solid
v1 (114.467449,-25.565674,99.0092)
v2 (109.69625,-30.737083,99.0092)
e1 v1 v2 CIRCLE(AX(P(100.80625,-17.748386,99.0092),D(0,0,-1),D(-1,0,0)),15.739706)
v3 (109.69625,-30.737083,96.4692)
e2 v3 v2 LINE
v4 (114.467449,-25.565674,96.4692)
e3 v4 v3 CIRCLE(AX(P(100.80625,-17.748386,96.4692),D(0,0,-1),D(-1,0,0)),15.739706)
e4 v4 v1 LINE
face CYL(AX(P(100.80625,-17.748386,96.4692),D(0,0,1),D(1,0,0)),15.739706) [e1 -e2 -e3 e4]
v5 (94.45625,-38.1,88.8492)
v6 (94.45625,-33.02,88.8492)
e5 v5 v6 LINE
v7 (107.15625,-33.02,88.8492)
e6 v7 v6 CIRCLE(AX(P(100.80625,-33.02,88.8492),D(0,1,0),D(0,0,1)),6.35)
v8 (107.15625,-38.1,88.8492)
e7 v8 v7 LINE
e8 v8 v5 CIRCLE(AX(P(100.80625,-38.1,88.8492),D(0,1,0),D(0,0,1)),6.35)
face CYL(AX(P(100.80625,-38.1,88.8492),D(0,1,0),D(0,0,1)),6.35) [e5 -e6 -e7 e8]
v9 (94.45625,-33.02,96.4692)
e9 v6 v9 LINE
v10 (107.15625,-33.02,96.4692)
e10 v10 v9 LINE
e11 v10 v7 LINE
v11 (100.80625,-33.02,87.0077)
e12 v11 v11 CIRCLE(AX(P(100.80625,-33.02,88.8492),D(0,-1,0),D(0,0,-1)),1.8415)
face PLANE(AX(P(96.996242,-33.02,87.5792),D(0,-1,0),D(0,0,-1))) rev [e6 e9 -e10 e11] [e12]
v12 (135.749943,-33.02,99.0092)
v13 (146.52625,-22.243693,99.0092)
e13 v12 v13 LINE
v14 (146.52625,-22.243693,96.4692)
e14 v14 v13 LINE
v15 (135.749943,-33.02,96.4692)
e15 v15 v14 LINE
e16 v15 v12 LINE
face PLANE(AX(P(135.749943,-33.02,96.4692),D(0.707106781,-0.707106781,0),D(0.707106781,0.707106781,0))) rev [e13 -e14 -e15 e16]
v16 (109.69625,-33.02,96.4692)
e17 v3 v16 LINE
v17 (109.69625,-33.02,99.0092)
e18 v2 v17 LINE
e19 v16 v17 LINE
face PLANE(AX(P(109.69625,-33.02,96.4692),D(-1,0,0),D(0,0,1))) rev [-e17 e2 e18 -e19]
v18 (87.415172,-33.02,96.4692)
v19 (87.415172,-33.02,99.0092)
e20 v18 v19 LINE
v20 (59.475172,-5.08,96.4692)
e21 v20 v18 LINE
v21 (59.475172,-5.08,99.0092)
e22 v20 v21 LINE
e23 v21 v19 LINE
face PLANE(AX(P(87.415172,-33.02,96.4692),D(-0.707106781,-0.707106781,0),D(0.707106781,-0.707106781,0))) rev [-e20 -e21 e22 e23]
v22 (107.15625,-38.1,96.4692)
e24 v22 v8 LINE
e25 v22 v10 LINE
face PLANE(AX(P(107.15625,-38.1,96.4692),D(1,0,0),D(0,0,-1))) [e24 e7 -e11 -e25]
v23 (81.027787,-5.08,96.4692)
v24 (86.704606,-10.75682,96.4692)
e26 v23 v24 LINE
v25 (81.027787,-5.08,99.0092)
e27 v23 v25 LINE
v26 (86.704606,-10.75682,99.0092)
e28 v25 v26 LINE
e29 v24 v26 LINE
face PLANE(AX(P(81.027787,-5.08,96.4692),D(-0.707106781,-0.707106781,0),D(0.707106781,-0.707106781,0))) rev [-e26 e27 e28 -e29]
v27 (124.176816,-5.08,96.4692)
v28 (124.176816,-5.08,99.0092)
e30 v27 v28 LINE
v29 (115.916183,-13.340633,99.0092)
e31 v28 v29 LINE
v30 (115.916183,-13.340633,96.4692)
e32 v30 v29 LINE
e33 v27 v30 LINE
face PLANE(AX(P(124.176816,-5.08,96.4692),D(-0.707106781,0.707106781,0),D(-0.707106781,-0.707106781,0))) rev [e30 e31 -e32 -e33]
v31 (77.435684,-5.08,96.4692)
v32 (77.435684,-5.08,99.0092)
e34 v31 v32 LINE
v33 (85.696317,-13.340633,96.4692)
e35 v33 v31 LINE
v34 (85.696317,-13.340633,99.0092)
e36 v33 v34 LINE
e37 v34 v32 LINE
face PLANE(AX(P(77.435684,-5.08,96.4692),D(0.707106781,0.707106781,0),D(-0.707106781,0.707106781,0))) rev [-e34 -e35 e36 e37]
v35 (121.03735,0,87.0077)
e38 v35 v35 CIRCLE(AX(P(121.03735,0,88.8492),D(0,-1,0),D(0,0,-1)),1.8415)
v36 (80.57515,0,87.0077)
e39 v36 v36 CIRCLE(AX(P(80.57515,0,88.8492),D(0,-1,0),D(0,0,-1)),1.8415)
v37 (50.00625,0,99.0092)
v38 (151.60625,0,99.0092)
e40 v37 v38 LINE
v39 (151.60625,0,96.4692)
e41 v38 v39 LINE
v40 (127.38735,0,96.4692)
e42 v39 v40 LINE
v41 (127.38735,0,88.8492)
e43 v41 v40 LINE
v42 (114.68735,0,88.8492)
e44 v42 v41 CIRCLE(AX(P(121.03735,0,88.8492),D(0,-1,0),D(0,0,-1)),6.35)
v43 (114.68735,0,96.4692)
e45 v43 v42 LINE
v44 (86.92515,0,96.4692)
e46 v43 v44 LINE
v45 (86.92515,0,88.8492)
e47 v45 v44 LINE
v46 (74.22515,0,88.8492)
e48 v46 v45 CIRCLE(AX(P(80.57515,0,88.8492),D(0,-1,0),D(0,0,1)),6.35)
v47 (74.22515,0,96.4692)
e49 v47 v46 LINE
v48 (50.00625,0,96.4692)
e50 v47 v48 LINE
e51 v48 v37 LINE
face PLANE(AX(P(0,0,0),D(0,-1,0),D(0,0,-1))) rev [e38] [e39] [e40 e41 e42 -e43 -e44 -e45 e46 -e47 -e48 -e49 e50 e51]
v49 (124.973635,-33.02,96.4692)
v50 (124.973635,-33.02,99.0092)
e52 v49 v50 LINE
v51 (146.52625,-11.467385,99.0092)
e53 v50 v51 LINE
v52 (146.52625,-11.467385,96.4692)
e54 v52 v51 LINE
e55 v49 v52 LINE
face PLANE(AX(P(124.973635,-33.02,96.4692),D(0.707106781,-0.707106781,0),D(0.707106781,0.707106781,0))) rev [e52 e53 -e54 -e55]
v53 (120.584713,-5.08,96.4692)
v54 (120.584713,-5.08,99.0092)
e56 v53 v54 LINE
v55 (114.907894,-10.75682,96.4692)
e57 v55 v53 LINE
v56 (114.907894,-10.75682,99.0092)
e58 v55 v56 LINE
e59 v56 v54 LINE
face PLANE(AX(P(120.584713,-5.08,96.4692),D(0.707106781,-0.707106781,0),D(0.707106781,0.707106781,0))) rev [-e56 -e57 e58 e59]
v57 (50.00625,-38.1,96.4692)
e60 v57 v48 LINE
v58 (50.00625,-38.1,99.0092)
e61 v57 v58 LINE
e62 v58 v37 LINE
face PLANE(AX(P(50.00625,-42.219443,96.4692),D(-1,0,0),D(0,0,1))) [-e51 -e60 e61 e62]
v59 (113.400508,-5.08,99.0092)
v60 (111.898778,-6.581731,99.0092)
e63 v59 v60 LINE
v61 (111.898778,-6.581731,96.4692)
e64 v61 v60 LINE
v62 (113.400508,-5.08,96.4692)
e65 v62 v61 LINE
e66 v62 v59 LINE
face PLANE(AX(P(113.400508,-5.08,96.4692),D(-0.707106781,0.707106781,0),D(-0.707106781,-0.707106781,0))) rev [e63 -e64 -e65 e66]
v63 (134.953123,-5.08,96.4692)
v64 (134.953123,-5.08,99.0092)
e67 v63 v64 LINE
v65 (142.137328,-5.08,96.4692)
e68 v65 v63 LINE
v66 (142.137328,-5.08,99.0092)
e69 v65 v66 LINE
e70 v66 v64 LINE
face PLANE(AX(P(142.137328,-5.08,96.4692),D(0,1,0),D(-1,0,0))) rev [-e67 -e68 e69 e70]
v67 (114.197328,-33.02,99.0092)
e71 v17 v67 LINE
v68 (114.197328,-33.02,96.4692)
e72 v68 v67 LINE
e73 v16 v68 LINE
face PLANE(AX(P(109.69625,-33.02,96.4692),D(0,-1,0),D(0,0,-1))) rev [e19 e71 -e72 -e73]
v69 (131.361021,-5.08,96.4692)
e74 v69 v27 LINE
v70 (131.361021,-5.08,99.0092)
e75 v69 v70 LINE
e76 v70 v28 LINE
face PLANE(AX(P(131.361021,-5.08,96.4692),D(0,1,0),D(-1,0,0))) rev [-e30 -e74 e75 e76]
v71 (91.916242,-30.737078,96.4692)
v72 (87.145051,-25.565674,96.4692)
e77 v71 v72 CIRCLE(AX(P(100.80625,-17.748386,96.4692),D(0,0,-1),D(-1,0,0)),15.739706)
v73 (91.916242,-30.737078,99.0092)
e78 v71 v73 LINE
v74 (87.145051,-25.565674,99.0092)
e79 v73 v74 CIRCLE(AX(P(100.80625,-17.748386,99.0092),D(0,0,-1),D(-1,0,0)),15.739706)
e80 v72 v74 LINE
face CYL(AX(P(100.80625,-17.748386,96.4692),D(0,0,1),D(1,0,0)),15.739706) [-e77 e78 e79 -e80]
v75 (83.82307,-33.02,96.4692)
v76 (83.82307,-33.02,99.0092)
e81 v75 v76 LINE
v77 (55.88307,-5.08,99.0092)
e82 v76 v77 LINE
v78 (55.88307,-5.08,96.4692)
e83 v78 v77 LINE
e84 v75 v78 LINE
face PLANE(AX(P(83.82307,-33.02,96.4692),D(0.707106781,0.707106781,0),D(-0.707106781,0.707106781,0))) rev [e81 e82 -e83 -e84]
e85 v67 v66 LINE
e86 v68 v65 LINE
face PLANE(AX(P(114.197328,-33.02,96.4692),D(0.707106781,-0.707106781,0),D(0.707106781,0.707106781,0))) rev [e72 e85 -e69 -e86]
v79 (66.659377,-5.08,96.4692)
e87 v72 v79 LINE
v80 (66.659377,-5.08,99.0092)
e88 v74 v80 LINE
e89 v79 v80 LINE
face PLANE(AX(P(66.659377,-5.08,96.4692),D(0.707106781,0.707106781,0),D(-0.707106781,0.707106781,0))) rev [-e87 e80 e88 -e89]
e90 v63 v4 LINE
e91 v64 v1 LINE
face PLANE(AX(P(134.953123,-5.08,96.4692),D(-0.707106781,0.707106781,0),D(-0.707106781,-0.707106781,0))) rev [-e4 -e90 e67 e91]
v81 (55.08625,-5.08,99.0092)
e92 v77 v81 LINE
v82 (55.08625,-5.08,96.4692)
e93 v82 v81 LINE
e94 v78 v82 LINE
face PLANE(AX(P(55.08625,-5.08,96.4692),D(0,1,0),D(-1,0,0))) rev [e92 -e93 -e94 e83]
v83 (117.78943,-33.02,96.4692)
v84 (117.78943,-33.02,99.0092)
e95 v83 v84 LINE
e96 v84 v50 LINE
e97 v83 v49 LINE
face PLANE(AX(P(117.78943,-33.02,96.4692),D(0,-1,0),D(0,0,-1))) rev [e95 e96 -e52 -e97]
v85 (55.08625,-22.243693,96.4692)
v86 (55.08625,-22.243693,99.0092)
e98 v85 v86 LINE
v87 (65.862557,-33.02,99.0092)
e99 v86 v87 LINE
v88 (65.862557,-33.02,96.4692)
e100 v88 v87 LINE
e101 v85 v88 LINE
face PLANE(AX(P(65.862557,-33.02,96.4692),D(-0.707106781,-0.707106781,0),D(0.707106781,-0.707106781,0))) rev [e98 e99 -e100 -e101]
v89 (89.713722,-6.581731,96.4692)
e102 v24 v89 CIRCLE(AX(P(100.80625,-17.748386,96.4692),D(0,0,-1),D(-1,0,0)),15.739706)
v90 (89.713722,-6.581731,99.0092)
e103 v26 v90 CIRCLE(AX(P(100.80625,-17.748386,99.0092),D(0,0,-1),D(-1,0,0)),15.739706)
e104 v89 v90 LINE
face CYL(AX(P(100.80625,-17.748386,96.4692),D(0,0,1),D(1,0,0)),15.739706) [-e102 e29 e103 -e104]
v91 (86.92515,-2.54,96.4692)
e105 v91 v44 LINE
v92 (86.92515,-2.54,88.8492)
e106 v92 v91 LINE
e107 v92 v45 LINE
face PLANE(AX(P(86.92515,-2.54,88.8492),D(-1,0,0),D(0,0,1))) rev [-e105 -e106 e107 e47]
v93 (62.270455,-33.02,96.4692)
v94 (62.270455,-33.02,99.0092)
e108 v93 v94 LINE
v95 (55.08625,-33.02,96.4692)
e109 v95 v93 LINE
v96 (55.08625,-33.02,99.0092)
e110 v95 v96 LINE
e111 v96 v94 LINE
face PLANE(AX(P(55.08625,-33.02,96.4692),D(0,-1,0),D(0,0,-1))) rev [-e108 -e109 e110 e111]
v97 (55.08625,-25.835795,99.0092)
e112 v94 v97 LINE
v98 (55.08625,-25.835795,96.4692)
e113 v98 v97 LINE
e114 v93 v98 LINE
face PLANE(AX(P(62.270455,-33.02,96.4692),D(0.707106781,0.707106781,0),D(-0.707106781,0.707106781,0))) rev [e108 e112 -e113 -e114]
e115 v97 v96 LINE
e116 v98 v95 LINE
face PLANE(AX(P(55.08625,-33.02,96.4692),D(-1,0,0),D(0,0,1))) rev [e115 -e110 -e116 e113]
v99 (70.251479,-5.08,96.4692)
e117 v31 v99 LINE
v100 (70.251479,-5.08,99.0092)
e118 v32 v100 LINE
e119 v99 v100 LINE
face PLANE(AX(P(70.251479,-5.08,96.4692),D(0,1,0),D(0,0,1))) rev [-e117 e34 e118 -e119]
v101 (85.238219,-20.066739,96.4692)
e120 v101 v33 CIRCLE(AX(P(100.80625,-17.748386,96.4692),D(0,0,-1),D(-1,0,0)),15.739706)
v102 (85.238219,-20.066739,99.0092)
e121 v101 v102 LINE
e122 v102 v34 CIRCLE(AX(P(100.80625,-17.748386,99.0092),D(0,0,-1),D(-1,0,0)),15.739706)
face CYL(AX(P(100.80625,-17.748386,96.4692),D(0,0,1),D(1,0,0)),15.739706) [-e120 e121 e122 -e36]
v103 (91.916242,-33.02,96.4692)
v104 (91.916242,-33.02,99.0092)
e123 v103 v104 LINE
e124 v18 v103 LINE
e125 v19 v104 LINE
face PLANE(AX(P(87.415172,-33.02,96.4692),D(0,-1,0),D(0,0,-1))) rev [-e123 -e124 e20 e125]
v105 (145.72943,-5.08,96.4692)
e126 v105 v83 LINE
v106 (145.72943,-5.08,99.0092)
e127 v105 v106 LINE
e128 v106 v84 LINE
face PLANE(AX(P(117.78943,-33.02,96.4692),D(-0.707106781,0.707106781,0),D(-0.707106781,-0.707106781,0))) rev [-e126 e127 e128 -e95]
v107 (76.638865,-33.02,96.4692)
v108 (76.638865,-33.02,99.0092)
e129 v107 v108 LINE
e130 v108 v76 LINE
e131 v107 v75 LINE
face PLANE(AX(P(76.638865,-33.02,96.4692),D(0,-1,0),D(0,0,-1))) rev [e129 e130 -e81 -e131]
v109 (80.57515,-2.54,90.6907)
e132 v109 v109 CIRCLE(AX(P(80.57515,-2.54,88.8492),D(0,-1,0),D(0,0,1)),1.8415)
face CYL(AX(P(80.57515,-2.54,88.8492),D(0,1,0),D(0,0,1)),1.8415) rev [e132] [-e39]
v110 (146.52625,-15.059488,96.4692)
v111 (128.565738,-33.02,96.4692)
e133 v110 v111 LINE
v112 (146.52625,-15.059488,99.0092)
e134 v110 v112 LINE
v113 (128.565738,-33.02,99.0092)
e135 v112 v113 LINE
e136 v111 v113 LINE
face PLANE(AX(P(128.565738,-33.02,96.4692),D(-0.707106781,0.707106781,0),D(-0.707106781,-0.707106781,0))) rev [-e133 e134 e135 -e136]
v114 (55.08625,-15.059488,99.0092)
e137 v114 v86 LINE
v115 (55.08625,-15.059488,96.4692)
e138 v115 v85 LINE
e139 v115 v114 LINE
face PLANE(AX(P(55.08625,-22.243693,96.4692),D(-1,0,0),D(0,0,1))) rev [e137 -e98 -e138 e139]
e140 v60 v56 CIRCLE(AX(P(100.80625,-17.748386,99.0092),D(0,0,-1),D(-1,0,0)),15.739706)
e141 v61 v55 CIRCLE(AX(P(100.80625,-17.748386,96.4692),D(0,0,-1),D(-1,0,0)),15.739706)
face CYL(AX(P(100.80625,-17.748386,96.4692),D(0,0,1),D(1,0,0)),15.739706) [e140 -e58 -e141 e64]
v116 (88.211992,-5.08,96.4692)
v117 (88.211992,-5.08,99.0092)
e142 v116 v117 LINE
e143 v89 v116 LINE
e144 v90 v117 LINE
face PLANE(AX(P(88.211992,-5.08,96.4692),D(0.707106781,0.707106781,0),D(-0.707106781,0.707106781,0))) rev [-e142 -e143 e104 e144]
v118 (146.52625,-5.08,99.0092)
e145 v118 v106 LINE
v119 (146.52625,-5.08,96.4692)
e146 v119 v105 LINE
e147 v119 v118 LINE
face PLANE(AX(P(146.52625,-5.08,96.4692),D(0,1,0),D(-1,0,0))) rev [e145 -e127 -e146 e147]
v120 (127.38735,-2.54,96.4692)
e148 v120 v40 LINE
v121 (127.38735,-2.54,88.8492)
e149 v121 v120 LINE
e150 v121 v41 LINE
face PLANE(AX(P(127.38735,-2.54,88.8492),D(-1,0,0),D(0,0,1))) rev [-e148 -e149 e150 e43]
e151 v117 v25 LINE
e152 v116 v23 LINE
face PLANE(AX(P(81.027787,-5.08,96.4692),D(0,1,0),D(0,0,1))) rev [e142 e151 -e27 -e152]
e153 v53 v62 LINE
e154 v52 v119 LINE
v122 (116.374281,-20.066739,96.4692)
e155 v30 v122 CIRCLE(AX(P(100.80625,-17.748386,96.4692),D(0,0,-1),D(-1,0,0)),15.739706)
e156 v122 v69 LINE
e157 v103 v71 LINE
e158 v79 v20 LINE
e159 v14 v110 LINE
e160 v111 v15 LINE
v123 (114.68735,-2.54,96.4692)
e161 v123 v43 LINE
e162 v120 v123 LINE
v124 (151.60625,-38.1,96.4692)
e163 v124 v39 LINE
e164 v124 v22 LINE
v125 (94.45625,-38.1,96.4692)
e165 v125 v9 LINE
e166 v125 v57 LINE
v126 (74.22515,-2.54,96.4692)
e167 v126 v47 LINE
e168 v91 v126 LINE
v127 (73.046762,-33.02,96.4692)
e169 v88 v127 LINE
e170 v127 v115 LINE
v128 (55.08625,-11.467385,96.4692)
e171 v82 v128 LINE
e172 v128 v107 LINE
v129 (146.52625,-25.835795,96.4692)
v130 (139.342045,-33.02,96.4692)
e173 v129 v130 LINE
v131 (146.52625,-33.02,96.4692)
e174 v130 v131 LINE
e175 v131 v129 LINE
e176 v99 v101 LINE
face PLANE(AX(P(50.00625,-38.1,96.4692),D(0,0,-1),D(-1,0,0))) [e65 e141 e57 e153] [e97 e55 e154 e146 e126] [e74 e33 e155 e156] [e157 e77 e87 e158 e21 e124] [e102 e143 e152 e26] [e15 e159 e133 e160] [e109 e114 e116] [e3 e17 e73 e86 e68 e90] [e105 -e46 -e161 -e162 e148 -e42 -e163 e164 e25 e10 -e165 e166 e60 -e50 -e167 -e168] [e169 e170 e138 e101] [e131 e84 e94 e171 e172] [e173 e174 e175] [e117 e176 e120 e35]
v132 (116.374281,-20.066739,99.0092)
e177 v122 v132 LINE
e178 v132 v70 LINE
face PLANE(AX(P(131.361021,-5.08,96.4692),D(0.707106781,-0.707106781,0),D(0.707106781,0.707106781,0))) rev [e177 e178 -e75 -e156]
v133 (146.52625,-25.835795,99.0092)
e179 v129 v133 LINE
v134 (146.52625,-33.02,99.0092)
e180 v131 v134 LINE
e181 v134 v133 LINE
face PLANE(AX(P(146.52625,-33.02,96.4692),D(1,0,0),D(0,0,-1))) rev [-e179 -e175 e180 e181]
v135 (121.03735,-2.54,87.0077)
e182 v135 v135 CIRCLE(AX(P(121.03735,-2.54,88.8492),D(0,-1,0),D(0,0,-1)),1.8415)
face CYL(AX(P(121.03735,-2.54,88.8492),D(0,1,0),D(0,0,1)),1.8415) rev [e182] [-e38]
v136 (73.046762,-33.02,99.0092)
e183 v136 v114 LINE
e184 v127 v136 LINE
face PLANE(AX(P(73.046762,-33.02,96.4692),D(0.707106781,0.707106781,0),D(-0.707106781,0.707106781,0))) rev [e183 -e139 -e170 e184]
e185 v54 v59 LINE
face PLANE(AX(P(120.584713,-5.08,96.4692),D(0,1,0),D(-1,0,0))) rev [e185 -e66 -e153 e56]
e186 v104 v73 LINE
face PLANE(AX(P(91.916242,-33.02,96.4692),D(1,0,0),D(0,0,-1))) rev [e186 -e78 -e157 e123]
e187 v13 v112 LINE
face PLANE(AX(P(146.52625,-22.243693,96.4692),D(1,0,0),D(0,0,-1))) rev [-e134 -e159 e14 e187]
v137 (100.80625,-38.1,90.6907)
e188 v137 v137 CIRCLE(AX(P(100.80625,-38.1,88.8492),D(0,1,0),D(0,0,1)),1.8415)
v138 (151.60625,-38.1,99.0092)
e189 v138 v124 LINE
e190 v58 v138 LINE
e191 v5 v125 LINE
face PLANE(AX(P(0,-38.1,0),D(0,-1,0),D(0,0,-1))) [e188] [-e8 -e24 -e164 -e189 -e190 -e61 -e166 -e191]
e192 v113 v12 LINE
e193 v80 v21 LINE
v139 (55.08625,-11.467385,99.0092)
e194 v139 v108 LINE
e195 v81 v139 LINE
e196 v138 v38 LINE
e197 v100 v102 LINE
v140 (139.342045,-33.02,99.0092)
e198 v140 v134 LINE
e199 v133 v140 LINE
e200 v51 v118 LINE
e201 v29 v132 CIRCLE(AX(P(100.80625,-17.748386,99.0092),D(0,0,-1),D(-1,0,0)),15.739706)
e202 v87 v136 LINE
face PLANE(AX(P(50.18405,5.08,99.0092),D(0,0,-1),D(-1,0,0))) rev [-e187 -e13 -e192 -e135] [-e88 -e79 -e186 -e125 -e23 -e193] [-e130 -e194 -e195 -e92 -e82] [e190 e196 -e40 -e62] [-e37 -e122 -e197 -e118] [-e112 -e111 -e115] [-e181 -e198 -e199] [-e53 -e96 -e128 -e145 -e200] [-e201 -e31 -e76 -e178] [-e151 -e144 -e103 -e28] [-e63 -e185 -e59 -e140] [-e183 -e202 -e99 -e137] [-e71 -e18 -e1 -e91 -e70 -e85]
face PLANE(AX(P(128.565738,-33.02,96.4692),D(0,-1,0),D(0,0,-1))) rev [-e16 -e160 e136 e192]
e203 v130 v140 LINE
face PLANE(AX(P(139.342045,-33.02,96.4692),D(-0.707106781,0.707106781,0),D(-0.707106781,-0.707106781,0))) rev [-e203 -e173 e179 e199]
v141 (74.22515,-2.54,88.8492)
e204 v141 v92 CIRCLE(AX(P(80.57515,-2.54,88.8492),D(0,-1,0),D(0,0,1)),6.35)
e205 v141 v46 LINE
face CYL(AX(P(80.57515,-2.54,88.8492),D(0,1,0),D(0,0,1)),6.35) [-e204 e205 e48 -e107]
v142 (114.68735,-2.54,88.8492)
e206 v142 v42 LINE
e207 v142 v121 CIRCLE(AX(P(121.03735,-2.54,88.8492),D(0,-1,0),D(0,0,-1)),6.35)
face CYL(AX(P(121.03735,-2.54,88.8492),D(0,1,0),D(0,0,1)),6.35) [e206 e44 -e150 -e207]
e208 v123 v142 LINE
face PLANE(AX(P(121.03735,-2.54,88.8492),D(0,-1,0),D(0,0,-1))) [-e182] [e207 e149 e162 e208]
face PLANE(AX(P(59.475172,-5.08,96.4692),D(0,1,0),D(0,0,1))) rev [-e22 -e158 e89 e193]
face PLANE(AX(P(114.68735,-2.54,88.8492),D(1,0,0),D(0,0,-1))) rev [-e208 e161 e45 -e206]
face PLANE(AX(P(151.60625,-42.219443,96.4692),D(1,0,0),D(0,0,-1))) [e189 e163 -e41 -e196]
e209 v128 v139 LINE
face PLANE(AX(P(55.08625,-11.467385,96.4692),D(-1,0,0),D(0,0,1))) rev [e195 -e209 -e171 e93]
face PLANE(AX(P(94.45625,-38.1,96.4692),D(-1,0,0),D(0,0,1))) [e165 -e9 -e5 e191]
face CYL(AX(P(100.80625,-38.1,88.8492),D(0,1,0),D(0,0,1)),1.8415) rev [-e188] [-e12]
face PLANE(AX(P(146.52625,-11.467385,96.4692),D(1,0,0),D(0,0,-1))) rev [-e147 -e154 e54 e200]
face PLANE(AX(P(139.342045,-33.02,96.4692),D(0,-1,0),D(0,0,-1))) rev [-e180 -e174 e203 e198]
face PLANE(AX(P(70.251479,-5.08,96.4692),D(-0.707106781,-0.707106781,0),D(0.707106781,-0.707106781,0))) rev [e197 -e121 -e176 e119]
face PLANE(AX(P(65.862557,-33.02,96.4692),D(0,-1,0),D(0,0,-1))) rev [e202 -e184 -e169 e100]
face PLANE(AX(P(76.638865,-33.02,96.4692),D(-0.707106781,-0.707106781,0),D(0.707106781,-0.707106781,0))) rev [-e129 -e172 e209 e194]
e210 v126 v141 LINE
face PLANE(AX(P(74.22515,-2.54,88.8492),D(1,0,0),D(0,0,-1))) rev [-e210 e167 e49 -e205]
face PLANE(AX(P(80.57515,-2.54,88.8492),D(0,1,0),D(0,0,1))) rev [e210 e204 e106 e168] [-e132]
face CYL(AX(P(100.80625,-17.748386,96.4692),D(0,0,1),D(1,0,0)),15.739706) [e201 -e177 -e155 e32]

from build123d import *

# Parameters (mm, degrees)
SKETCH1_R               = 13.8795
SKETCH1_R_2             = 13.8811
SKETCH1_R_3             = 2.54
SKETCH1_W               = 163.5125
SKETCH1_H               = 30.6038
BOSS_EXTRUDE1_DEPTH     = 5.08
SKETCH3_W               = 101.6
SKETCH3_H               = 2.54
BOSS_EXTRUDE4_DEPTH     = 38.1
SKETCH7_W               = 7.620008307
SKETCH7_H               = 5.08
BOSS_EXTRUDE5_DEPTH     = 11.43
FILLET5_RADIUS          = 3.810004153
FILLET5_LENGTH          = 5.08
BOSS_EXTRUDE6_DEPTH     = 2.54
SKETCH15_R              = 1.8415
BOSS_EXTRUDE7_DEPTH     = 2.54
CUT_EXTRUDE3_START      = -5.08
SKETCH19_R              = 1.8415
CUT_EXTRUDE3_DEPTH      = 5.08
SKETCH12_W              = 155.030782426
SKETCH12_H              = 26.837151361
CUT_EXTRUDE4_DEPTH      = 229.935471644
CUT_EXTRUDE5_DEPTH      = 2.54
FILLET6_R               = 2.54
BOSS_EXTRUDE8_DEPTH     = 5.08
CUT_EXTRUDE6_DEPTH      = 186.437362631
CUT_EXTRUDE6_DEPTH_BACK = 186.437362631
SKETCH23_R              = 1.8415
SKETCH25_R              = 14.498901864
CUT_EXTRUDE7_DEPTH      = 2.54
SKETCH26_W              = 2.812159358
SKETCH26_H              = 2.54
SKETCH26_W_2            = 3.243179234
BOSS_EXTRUDE9_DEPTH     = 38.1


with BuildPart() as part:
    # Sketch1 → Boss-Extrude1 (new body)
    with BuildSketch(Plane(origin=(0, 0, 0), x_dir=(1, 0, 0), z_dir=(0, 1, 0))):
        with BuildLine():
            Line((0, 0), (201.6125, 0))
            Line((201.6125, 0), (201.6125, -45.847))
            Line((201.6125, -45.847), (166.66845, -45.847))
            Line((166.66845, -45.847), (166.66845, -83.7692))
            ThreePointArc((166.66845, -83.7692), (162.204757345, -94.545507345), (151.42845, -99.0092))
            Line((151.42845, -99.0092), (50.18405, -99.0092))
            ThreePointArc((50.18405, -99.0092), (39.407742655, -94.545507345), (34.94405, -83.7692))
            Line((34.94405, -83.7692), (34.94405, -45.847))
            Line((34.94405, -45.847), (0, -45.847))
            Line((0, -45.847), (0, 0))
        make_face()
        with Locations(Location((60.34405, -72.4265, 0), (0, 0, 270))):
            Circle(SKETCH1_R, mode=Mode.SUBTRACT)
        with Locations(Location((141.26845, -72.4281, 0), (0, 0, 270))):
            Circle(SKETCH1_R_2, mode=Mode.SUBTRACT)
        with Locations(Location((13.096875, -9.7139, 0), (0, 0, 270))):
            Circle(SKETCH1_R_3, mode=Mode.SUBTRACT)
        with Locations(Location((188.515625, -9.7139, 0), (0, 0, 270))):
            Circle(SKETCH1_R_3, mode=Mode.SUBTRACT)
        with Locations(Location((13.096875, -36.1299, 0), (0, 0, 270))):
            Circle(SKETCH1_R_3, mode=Mode.SUBTRACT)
        with Locations(Location((188.515625, -36.1299, 0), (0, 0, 270))):
            Circle(SKETCH1_R_3, mode=Mode.SUBTRACT)
        with Locations(Location((100.80625, -72.4281, 0), (0, 0, 270))):
            Circle(SKETCH1_R_2, mode=Mode.SUBTRACT)
        with Locations((100.80625, -22.9219)):
            Rectangle(SKETCH1_W, SKETCH1_H, mode=Mode.SUBTRACT)
    extrude(amount=BOSS_EXTRUDE1_DEPTH)

    # Sketch3 → Boss-Extrude4 (add)
    with BuildSketch(Plane(origin=(0, 0, 198.0184), x_dir=(-1, 0, 0), z_dir=(0, 1, 0))):
        with Locations((-100.80625, -100.2792)):
            Rectangle(SKETCH3_W, SKETCH3_H)
    extrude(amount=-BOSS_EXTRUDE4_DEPTH)

    # Sketch7 → Boss-Extrude5 (add)
    with BuildSketch(Plane(origin=(0, 0, 99.0092), x_dir=(1, 0, 0), z_dir=(0, 0, -1))):
        with Locations((100.806245847, 35.56)):
            Rectangle(SKETCH7_W, SKETCH7_H)
    extrude(amount=BOSS_EXTRUDE5_DEPTH)

    # Fillet5: full round fillet: the end face becomes a half cylinder, R = half its width
    fillet5_face = Plane((100.806245847, -35.56, 87.5792), x_dir=(0, 1, 0), z_dir=(0, 0, -1))  # on the end face: x along it, z out of the body
    fillet5_slab = fillet5_face.offset(-FILLET5_RADIUS / 2) * Box(FILLET5_LENGTH, 2 * FILLET5_RADIUS, FILLET5_RADIUS, mode=Mode.PRIVATE)  # the body's end, R deep
    fillet5_round = Plane((100.806245847, -35.56, 91.389204153), x_dir=(0, 0, -1), z_dir=(0, 1, 0)) * Cylinder(FILLET5_RADIUS, FILLET5_LENGTH, mode=Mode.PRIVATE)  # its axis R under the face
    add(fillet5_slab - fillet5_round, mode=Mode.SUBTRACT)

    # Sketch14 → Boss-Extrude6 (add)
    with BuildSketch(Plane(origin=(0, 0, 99.0092), x_dir=(-1, 0, 0), z_dir=(0, 0, -1))):
        with BuildLine():
            Line((-106.692297799, -23.852483199), (-108.165059803, -25.325245202))
            ThreePointArc((-108.165059803, -25.325245202), (-108.695299399, -24.799048835), (-109.188003193, -24.237551179))
            Line((-109.188003193, -24.237551179), (-111.016232612, -25.73340078))
            ThreePointArc((-111.016232612, -25.73340078), (-112.008576056, -24.346487635), (-112.813712744, -22.843148519))
            Line((-112.813712744, -22.843148519), (-110.663621263, -21.864835961))
            ThreePointArc((-110.663621263, -21.864835961), (-111.169570673, -20.523896068), (-111.494018753, -19.127888173))
            Line((-111.494018753, -19.127888173), (-113.825236675, -19.509217219))
            ThreePointArc((-113.825236675, -19.509217219), (-113.991174734, -17.81194348), (-113.936774001, -16.107445271))
            Line((-113.936774001, -16.107445271), (-111.585583879, -16.335247483))
            ThreePointArc((-111.585583879, -16.335247483), (-111.353278975, -14.920984767), (-110.936255307, -13.549782426))
            Line((-110.936255307, -13.549782426), (-113.145813772, -12.714414106))
            ThreePointArc((-113.145813772, -12.714414106), (-112.440883477, -11.161562901), (-111.541521956, -9.712624518))
            Line((-111.541521956, -9.712624518), (-109.619232687, -11.085502082))
            ThreePointArc((-109.619232687, -11.085502082), (-108.71091938, -9.976867094), (-107.664165119, -8.997882867))
            Line((-107.664165119, -8.997882867), (-109.160014721, -7.169653447))
            ThreePointArc((-109.160014721, -7.169653447), (-107.773101576, -6.177310003), (-106.26976246, -5.372173315))
            Line((-106.26976246, -5.372173315), (-105.291449901, -7.522264796))
            ThreePointArc((-105.291449901, -7.522264796), (-103.950510009, -7.016315387), (-102.554502114, -6.691867307))
            Line((-102.554502114, -6.691867307), (-102.93583116, -4.360649385))
            ThreePointArc((-102.93583116, -4.360649385), (-101.238557421, -4.194711325), (-99.534059212, -4.249112058))
            Line((-99.534059212, -4.249112058), (-99.761861424, -6.600302181))
            ThreePointArc((-99.761861424, -6.600302181), (-98.347598708, -6.832607085), (-96.976396367, -7.249630753))
            Line((-96.976396367, -7.249630753), (-96.141028047, -5.040072288))
            ThreePointArc((-96.141028047, -5.040072288), (-94.588176842, -5.745002582), (-93.139238459, -6.644364103))
            Line((-93.139238459, -6.644364103), (-94.512116023, -8.566653372))
            ThreePointArc((-94.512116023, -8.566653372), (-93.403481035, -9.474966679), (-92.424496807, -10.52172094))
            Line((-92.424496807, -10.52172094), (-90.596267388, -9.025871338))
            ThreePointArc((-90.596267388, -9.025871338), (-89.603923944, -10.412784483), (-88.798787256, -11.9161236))
            Line((-88.798787256, -11.9161236), (-90.948878737, -12.894436158))
            ThreePointArc((-90.948878737, -12.894436158), (-90.442929327, -14.23537605), (-90.118481247, -15.631383945))
            Line((-90.118481247, -15.631383945), (-87.787263325, -15.250054899))
            ThreePointArc((-87.787263325, -15.250054899), (-87.621325266, -16.947328638), (-87.675725999, -18.651826847))
            Line((-87.675725999, -18.651826847), (-90.026916121, -18.424024635))
            ThreePointArc((-90.026916121, -18.424024635), (-90.261418035, -19.847693028), (-90.683092324, -21.227553033))
            Line((-90.683092324, -21.227553033), (-88.475027465, -22.066861331))
            ThreePointArc((-88.475027465, -22.066861331), (-89.182726542, -23.618452644), (-90.084671181, -25.065784483))
            Line((-90.084671181, -25.065784483), (-92.004508517, -23.689480212))
            ThreePointArc((-92.004508517, -23.689480212), (-92.446198552, -24.26398978), (-92.925321338, -24.807674144))
            Line((-92.925321338, -24.807674144), (-94.354515121, -23.023521367))
            ThreePointArc((-94.354515121, -23.023521367), (-93.409906556, -21.784451479), (-92.300984022, -20.689978846))
            Line((-92.300984022, -20.689978846), (-92.300984022, -12.009378674))
            ThreePointArc((-92.300984022, -12.009378674), (-96.99616691, -10.159066764), (-100.80625, -6.84973702))
            ThreePointArc((-100.80625, -6.84973702), (-104.633502919, -10.130984342), (-109.311759392, -12.009378674))
            Line((-109.311759392, -12.009378674), (-109.311759392, -20.689978846))
            ThreePointArc((-109.311759392, -20.689978846), (-107.900903874, -22.187470719), (-106.692297799, -23.852483199))
        make_face()
        with BuildLine():
            Line((-100.80625, -23.220768427), (-99.599369927, -22.380573493))
            Line((-99.599369927, -22.380573493), (-99.599369927, -18.3831432))
            Line((-99.599369927, -18.3831432), (-94.428037288, -16.022579614))
            Line((-94.428037288, -16.022579614), (-95.257330485, -18.716255471))
            Line((-95.257330485, -18.716255471), (-98.169049816, -19.087499686))
            Line((-98.169049816, -19.087499686), (-98.169049816, -30.877249674))
            Line((-98.169049816, -30.877249674), (-98.113370072, -30.877249674))
            ThreePointArc((-98.113370072, -30.877249674), (-96.397994117, -25.717029016), (-93.380333496, -21.193300875))
            Line((-93.380333496, -21.193300875), (-93.380333496, -12.307821257))
            ThreePointArc((-93.380333496, -12.307821257), (-97.539082277, -10.495406691), (-100.80625, -7.348081946))
            ThreePointArc((-100.80625, -7.348081946), (-104.073417723, -10.495406691), (-108.232166504, -12.307821257))
            Line((-108.232166504, -12.307821257), (-108.232166504, -21.193300875))
            ThreePointArc((-108.232166504, -21.193300875), (-105.214505883, -25.717029016), (-103.499129928, -30.877249674))
            Line((-103.499129928, -30.877249674), (-103.443450184, -30.877249674))
            Line((-103.443450184, -30.877249674), (-103.443450184, -19.087499686))
            Line((-103.443450184, -19.087499686), (-106.355169515, -18.716255471))
            Line((-106.355169515, -18.716255471), (-107.184462712, -16.022579614))
            Line((-107.184462712, -16.022579614), (-102.013130073, -18.3831432))
            Line((-102.013130073, -18.3831432), (-102.013130073, -22.380573493))
            Line((-102.013130073, -22.380573493), (-100.80625, -23.220768427))
        make_face()
    extrude(amount=-BOSS_EXTRUDE6_DEPTH)

    # Sketch15 → Boss-Extrude7 (add)
    # profile 1 of 2: a face of its own
    with BuildSketch(Plane.XZ):
        with BuildLine():
            Line((114.68735, 88.8492), (114.68735, 96.4692))
            Line((114.68735, 96.4692), (127.38735, 96.4692))
            Line((127.38735, 96.4692), (127.38735, 88.8492))
            ThreePointArc((127.38735, 88.8492), (121.03735, 82.4992), (114.68735, 88.8492))
        make_face()
        with Locations(Location((121.03735, 88.8492, 0), (0, 0, 270))):
            Circle(SKETCH15_R, mode=Mode.SUBTRACT)
    # profile 2 of 2: a face of its own
    with BuildSketch(Plane.XZ):
        with BuildLine():
            Line((74.22515, 96.4692), (86.92515, 96.4692))
            Line((86.92515, 96.4692), (86.92515, 88.8492))
            ThreePointArc((86.92515, 88.8492), (80.57515, 82.4992), (74.22515, 88.8492))
            Line((74.22515, 88.8492), (74.22515, 96.4692))
        make_face()
        with Locations(Location((80.57515, 88.8492, 0), (0, 0, 90))):
            Circle(SKETCH15_R, mode=Mode.SUBTRACT)
    extrude(amount=BOSS_EXTRUDE7_DEPTH)

    # Sketch19 → Cut-Extrude3 (cut)
    with BuildSketch(Plane.XZ.offset(CUT_EXTRUDE3_START)):
        with Locations(Location((80.57515, 88.8492, 0), (0, 0, 90))):
            Circle(SKETCH19_R)
        with Locations(Location((121.03735, 88.8492, 0), (0, 0, 270))):
            Circle(SKETCH19_R)
    extrude(amount=CUT_EXTRUDE3_DEPTH, mode=Mode.SUBTRACT)

    # Sketch12 → Cut-Extrude4 (cut, through all)
    with BuildSketch(Plane(origin=(201.6125, 0, 0), x_dir=(0, 0, -1), z_dir=(1, 0, 0))):
        with Locations((-77.515391213, 13.418575681)):
            Rectangle(SKETCH12_W, SKETCH12_H)
    extrude(amount=-CUT_EXTRUDE4_DEPTH, mode=Mode.SUBTRACT)

    # Sketch21 → Cut-Extrude5 (cut)
    with BuildSketch(Plane.XY.offset(99.0092)):
        Polygon((55.08625, -33.02), (55.08625, -25.835795103), (62.270454897, -33.02), align=None)
        Polygon((55.08625, -5.08), (55.883069587, -5.08), (83.823069587, -33.02), (76.638864691, -33.02), (55.08625, -11.467385309), align=None)
        with BuildLine():
            Line((91.916241693, -33.02), (91.916241693, -30.737077601))
            ThreePointArc((91.916241693, -30.737077601), (89.237970167, -28.421401444), (87.1450505, -25.565673567))
            Line((87.1450505, -25.565673567), (66.659376933, -5.08))
            Line((66.659376933, -5.08), (59.475172036, -5.08))
            Line((59.475172036, -5.08), (87.415172036, -33.02))
            Line((87.415172036, -33.02), (91.916241693, -33.02))
        make_face()
        Polygon((146.52625, -5.08), (145.729430413, -5.08), (117.789430413, -33.02), (124.973635309, -33.02), (146.52625, -11.467385309), align=None)
        with BuildLine():
            Line((109.69625, -33.02), (114.197327964, -33.02))
            Line((114.197327964, -33.02), (142.137327964, -5.08))
            Line((142.137327964, -5.08), (134.953123067, -5.08))
            Line((134.953123067, -5.08), (114.4674495, -25.565673567))
            ThreePointArc((114.4674495, -25.565673567), (112.374526421, -28.421405143), (109.69625, -30.737083287))
            Line((109.69625, -30.737083287), (109.69625, -33.02))
        make_face()
        Polygon((146.52625, -33.02), (146.52625, -25.835795103), (139.342045103, -33.02), align=None)
        Polygon((135.749942655, -33.02), (146.52625, -22.243692655), (146.52625, -15.059487758), (128.565737758, -33.02), align=None)
        with BuildLine():
            Line((124.176815722, -5.08), (115.916182775, -13.340632947))
            ThreePointArc((115.916182775, -13.340632947), (116.509577502, -16.678871551), (116.374281129, -20.06673949))
            Line((116.374281129, -20.06673949), (131.361020619, -5.08))
            Line((131.361020619, -5.08), (124.176815722, -5.08))
        make_face()
        with BuildLine():
            Line((120.584713274, -5.08), (114.907893678, -10.756819596))
            ThreePointArc((114.907893678, -10.756819596), (113.575134343, -8.545454533), (111.89877754, -6.581730837))
            Line((111.89877754, -6.581730837), (113.400508377, -5.08))
            Line((113.400508377, -5.08), (120.584713274, -5.08))
        make_face()
        Polygon((65.862557345, -33.02), (55.08625, -22.243692655), (55.08625, -15.059487758), (73.046762242, -33.02), align=None)
        with BuildLine():
            Line((70.251479381, -5.08), (85.238218871, -20.06673949))
            ThreePointArc((85.238218871, -20.06673949), (85.102922498, -16.678871551), (85.696317225, -13.340632947))
            Line((85.696317225, -13.340632947), (77.435684278, -5.08))
            Line((77.435684278, -5.08), (70.251479381, -5.08))
        make_face()
        with BuildLine():
            Line((81.027786726, -5.08), (86.704606322, -10.756819596))
            ThreePointArc((86.704606322, -10.756819596), (88.037365657, -8.545454533), (89.71372246, -6.581730837))
            Line((89.71372246, -6.581730837), (88.211991623, -5.08))
            Line((88.211991623, -5.08), (81.027786726, -5.08))
        make_face()
    extrude(amount=-CUT_EXTRUDE5_DEPTH, mode=Mode.SUBTRACT)

    # Fillet6
    fillet6_edges = [part.edges().sort_by_distance(p)[0] for p in [
        (151.60625, -19.05, 99.0092),
        (50.00625, -19.05, 99.0092),
    ]]
    fillet(fillet6_edges, radius=FILLET6_R - 0.0001)  # a hair under: the kernel refuses the full size

    # Sketch22 → Boss-Extrude8 (add)
    with BuildSketch(Plane(origin=(0, -33.02, 0), x_dir=(1, 0, 0), z_dir=(0, 1, 0))):
        with BuildLine():
            Line((94.45625, -96.4692), (94.45625, -88.8492))
            ThreePointArc((94.45625, -88.8492), (100.80625, -82.4992), (107.15625, -88.8492))
            Line((107.15625, -88.8492), (107.15625, -96.4692))
            Line((107.15625, -96.4692), (94.45625, -96.4692))
        make_face()
    extrude(amount=-BOSS_EXTRUDE8_DEPTH)

    # Sketch23 → Cut-Extrude6 (cut, two sides: drawn at the far end of the back side and taken through both)
    with BuildSketch(Plane(origin=(0, -33.02, 0), x_dir=(1, 0, 0), z_dir=(0, 1, 0)).offset(-CUT_EXTRUDE6_DEPTH_BACK)):
        with Locations(Location((100.80625, -88.8492, 0), (0, 0, 270))):
            Circle(SKETCH23_R)
    extrude(amount=CUT_EXTRUDE6_DEPTH + CUT_EXTRUDE6_DEPTH_BACK, mode=Mode.SUBTRACT)

    # Sketch25 → Cut-Extrude7 (cut)
    with BuildSketch(Plane.XY.offset(99.0092)):
        with Locations((100.80625, -17.748386051)):
            Circle(SKETCH25_R)
    extrude(amount=CUT_EXTRUDE7_DEPTH, mode=Mode.SUBTRACT)

    # Sketch26 → Boss-Extrude9 (add)
    with BuildSketch(Plane(origin=(0, 0, 0), x_dir=(1, 0, 0), z_dir=(0, 1, 0))):
        with Locations((51.412329679, -97.7392)):
            Rectangle(SKETCH26_W, SKETCH26_H)
        with Locations((149.984660383, -97.7392)):
            Rectangle(SKETCH26_W_2, SKETCH26_H)
    extrude(amount=-BOSS_EXTRUDE9_DEPTH)


solid = part.part
